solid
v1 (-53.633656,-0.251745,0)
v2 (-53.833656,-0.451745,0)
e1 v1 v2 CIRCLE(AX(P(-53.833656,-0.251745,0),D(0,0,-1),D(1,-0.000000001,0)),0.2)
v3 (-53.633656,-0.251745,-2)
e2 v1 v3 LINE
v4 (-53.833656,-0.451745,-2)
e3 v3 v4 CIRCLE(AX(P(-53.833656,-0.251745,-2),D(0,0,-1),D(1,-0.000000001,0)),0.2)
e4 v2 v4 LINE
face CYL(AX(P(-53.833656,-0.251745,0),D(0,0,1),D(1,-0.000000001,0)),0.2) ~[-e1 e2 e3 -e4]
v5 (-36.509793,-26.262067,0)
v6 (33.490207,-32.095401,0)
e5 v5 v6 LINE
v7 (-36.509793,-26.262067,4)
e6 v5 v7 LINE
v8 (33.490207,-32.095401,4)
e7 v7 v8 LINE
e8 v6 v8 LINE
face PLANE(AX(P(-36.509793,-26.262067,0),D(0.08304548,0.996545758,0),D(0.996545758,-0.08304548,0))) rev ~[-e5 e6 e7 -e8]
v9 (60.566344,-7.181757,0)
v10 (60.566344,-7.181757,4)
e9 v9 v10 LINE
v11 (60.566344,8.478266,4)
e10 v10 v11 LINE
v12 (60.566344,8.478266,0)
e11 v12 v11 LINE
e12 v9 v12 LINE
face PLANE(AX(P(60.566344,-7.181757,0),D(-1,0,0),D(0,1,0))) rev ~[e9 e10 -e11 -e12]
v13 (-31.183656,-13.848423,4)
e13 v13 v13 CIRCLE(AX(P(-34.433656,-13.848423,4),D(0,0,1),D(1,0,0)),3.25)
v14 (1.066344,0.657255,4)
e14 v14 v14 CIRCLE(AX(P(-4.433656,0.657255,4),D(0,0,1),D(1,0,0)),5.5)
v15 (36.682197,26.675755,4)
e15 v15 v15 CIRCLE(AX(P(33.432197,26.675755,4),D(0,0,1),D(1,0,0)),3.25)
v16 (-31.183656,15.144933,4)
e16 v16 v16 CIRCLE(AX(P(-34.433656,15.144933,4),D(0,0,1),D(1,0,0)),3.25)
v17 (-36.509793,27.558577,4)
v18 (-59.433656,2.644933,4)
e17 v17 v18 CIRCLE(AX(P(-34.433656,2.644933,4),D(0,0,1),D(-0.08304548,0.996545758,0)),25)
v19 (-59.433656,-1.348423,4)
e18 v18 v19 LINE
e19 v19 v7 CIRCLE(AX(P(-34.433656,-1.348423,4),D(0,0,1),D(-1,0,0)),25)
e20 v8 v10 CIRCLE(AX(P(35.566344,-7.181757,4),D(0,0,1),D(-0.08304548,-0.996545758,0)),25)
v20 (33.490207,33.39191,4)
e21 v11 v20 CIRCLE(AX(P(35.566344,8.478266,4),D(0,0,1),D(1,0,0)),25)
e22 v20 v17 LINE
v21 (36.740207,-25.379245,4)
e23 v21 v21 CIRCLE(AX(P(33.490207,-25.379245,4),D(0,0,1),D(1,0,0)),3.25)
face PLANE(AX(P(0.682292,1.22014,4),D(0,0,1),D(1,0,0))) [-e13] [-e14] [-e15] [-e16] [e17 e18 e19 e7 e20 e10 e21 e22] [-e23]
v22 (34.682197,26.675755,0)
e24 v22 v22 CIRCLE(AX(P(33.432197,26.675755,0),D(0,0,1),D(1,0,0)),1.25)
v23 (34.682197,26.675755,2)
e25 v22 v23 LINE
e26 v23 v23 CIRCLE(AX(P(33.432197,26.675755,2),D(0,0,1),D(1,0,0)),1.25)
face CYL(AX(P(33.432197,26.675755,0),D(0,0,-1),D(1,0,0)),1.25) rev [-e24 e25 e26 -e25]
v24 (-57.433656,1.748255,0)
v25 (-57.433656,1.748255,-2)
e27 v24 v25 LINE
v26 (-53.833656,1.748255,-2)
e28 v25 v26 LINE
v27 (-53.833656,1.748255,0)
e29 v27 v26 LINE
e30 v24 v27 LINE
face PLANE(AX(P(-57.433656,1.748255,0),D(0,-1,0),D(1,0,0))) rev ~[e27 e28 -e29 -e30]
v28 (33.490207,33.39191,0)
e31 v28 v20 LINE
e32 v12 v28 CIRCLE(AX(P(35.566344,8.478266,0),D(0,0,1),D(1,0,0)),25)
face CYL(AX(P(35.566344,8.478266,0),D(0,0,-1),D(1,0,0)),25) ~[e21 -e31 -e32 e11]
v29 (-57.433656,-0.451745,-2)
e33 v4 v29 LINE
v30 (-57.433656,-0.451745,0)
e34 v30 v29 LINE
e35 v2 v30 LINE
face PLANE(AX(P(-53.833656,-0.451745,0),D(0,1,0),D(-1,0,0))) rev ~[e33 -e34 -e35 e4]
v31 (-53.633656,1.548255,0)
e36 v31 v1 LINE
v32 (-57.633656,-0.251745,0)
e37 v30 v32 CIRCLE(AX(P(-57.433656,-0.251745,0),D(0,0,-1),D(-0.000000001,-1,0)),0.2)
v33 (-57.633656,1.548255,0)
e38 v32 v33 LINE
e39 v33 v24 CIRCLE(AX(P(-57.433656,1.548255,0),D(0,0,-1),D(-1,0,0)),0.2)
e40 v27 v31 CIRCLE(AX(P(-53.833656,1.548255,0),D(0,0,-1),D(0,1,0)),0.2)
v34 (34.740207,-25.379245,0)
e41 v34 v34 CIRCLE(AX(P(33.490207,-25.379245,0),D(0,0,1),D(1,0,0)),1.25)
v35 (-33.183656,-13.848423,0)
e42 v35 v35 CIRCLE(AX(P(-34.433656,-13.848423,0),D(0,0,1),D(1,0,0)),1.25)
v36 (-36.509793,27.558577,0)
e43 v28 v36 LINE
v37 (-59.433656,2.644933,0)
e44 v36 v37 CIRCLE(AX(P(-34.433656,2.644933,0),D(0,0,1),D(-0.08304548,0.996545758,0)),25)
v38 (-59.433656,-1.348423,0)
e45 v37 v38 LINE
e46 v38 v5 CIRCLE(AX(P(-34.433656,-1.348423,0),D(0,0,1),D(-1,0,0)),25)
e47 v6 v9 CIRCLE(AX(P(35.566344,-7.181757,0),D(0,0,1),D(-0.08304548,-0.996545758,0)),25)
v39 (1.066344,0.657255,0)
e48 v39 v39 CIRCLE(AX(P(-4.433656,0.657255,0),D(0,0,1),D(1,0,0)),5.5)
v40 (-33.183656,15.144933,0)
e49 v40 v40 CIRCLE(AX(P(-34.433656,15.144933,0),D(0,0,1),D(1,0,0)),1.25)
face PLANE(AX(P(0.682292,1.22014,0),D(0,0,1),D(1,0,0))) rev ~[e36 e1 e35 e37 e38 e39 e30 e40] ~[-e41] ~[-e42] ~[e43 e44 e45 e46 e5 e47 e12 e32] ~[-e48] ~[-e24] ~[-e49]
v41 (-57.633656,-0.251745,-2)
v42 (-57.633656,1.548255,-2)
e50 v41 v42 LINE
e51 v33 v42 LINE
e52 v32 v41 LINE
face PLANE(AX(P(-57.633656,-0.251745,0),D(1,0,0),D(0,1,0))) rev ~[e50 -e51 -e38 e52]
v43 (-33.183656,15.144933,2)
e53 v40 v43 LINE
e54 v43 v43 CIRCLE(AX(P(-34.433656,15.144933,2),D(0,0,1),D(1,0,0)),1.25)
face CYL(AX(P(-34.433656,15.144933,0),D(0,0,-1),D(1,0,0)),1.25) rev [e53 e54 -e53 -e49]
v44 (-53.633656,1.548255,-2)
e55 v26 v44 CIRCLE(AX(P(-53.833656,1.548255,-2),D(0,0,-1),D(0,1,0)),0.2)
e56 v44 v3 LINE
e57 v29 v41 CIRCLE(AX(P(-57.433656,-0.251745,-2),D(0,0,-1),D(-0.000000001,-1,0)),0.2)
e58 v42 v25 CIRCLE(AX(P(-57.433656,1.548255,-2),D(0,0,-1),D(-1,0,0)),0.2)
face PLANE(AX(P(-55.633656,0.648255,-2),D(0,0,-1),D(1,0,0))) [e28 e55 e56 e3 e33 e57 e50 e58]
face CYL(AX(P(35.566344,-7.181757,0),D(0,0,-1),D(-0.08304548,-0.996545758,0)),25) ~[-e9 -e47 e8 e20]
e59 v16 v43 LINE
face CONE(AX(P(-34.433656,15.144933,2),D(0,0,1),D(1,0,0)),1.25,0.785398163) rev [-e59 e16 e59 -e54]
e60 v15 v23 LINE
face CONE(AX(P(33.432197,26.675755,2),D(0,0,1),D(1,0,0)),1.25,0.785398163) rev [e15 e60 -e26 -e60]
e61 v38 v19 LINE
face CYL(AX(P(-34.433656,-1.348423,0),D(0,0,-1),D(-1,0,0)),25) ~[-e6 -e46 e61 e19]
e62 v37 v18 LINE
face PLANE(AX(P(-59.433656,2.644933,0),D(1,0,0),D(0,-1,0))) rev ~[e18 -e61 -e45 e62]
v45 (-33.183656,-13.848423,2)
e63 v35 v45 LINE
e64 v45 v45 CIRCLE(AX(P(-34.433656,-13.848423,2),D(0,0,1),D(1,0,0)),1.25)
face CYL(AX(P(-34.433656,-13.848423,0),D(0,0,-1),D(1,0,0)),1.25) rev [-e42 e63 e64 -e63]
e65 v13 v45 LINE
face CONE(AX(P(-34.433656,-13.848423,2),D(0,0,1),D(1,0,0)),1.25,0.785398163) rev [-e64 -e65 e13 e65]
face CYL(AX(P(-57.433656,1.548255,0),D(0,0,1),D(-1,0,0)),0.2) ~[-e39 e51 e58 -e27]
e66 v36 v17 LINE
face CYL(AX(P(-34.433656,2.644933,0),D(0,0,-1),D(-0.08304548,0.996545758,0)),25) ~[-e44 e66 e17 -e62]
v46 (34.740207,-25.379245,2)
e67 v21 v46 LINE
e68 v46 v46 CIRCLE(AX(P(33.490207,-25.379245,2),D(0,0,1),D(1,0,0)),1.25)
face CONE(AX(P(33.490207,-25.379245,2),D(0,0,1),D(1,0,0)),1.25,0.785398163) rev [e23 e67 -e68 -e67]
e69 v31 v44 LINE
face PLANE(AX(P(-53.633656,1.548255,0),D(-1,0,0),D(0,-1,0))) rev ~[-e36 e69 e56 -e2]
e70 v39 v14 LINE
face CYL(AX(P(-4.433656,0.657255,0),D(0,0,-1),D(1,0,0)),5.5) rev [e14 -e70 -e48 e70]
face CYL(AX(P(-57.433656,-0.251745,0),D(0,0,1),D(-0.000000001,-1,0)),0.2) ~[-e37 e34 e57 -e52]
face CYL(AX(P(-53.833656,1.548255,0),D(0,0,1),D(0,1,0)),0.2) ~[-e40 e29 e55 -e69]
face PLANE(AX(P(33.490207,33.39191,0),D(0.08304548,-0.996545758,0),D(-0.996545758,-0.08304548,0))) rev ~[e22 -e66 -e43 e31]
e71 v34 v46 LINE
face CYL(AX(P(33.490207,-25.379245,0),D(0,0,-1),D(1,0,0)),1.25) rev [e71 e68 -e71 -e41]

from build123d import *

# Parameters (mm, degrees)
F0_R     = 1.25
F0_R_2   = 5.5
F1_DEPTH = 4
F3_DEPTH = 2
F4_SIZE  = 2


# Not quite as in the source:
# - a feature names something its author has since deleted; it is built from what else it names


with BuildPart() as f1:
    # F0 (on Top) → F1 (new body)
    with BuildSketch(Plane.XY):
        with BuildLine():
            ThreePointArc((-36.0336562554, 5.4360876058), (-41.0336562554, 10.4360876058), (-46.0336562554, 5.4360876058))
            ThreePointArc((-46.0336562554, 5.4360876058), (-48.7113140605, 0.9910484741), (-53.6336562554, -0.6517453414))
            Line((-53.6336562554, -0.6517453414), (-57.6336562554, -0.6517453414))
            Line((-57.6336562554, -0.6517453414), (-59.4336562554, -0.6517453414))
            Line((-59.4336562554, -0.6517453414), (-59.4336562554, -1.3484233022))
            ThreePointArc((-59.4336562554, -1.3484233022), (-52.8307134237, -18.2761605269), (-36.5097932518, -26.2620672584))
            Line((-36.5097932518, -26.2620672584), (33.4902067482, -32.0954005917))
            ThreePointArc((33.4902067482, -32.0954005917), (52.4940809692, -25.5788138039), (60.5663437446, -7.1817566356))
            Line((60.5663437446, -7.1817566356), (60.5663437446, 8.4782659528))
            ThreePointArc((60.5663437446, 8.4782659528), (52.4940809692, 26.8753231211), (33.4902067482, 33.3919099089))
            Line((33.4902067482, 33.3919099089), (-36.5097932518, 27.5585765756))
            ThreePointArc((-36.5097932518, 27.5585765756), (-52.8307134237, 19.5726698441), (-59.4336562554, 2.6449326195))
            Line((-59.4336562554, 2.6449326195), (-59.4336562554, 1.9482546586))
            Line((-59.4336562554, 1.9482546586), (-57.6336562554, 1.9482546586))
            Line((-57.6336562554, 1.9482546586), (-53.6336562554, 1.9482546586))
            ThreePointArc((-53.6336562554, 1.9482546586), (-50.3543429782, 2.8450290737), (-48.4065189788, 5.6314392355))
            ThreePointArc((-48.4065189788, 5.6314392355), (-40.8279863477, 12.5929298404), (-33.4336562554, 5.4360876058))
            ThreePointArc((-33.4336562554, 5.4360876058), (-31.5267024615, 2.8420068396), (-28.4336562554, 1.9482546586))
            Line((-28.4336562554, 1.9482546586), (-15.4336562554, 1.9482546586))
            Line((-15.4336562554, 1.9482546586), (-15.4336562554, 15.2482546586))
            Line((-15.4336562554, 15.2482546586), (-4.9336562554, 15.2482546586))
            Line((-4.9336562554, 15.2482546586), (-4.9336562554, 17.1757546586))
            ThreePointArc((-4.9336562554, 17.1757546586), (-0.8336562554, 21.2757546586), (3.2663437446, 17.1757546586))
            Line((3.2663437446, 17.1757546586), (3.2663437446, 15.2482546586))
            Line((3.2663437446, 15.2482546586), (29.2163437446, 15.2482546586))
            Line((29.2163437446, 15.2482546586), (29.2163437446, 17.1757546586))
            ThreePointArc((29.2163437446, 17.1757546586), (33.3163437446, 21.2757546586), (37.4163437446, 17.1757546586))
            Line((37.4163437446, 17.1757546586), (37.4163437446, 15.2482546586))
            Line((37.4163437446, 15.2482546586), (47.9163437446, 15.2482546586))
            Line((47.9163437446, 15.2482546586), (47.9163437446, -13.9517453414))
            Line((47.9163437446, -13.9517453414), (37.4163437446, -13.9517453414))
            Line((37.4163437446, -13.9517453414), (37.4163437446, -15.8792453414))
            ThreePointArc((37.4163437446, -15.8792453414), (33.3163437446, -19.9792453414), (29.2163437446, -15.8792453414))
            Line((29.2163437446, -15.8792453414), (29.2163437446, -13.9517453414))
            Line((29.2163437446, -13.9517453414), (3.2663437446, -13.9517453414))
            Line((3.2663437446, -13.9517453414), (3.2663437446, -15.8792453414))
            ThreePointArc((3.2663437446, -15.8792453414), (-0.8336562554, -19.9792453414), (-4.9336562554, -15.8792453414))
            Line((-4.9336562554, -15.8792453414), (-4.9336562554, -13.9517453414))
            Line((-4.9336562554, -13.9517453414), (-15.4336562554, -13.9517453414))
            Line((-15.4336562554, -13.9517453414), (-15.4336562554, -0.6517453414))
            Line((-15.4336562554, -0.6517453414), (-28.4336562554, -0.6517453414))
            ThreePointArc((-28.4336562554, -0.6517453414), (-33.3559984503, 0.991048474), (-36.0336562554, 5.4360876058))
        make_face()
        with Locations((-34.4336562554, -13.8484233022)):
            Circle(F0_R, mode=Mode.SUBTRACT)
        with Locations((33.4902067482, -25.3792453414)):
            Circle(F0_R, mode=Mode.SUBTRACT)
        with Locations((-34.4336562554, 15.1449326195)):
            Circle(F0_R, mode=Mode.SUBTRACT)
        with Locations((33.4321971192, 26.6757546586)):
            Circle(F0_R, mode=Mode.SUBTRACT)
        with BuildLine():
            ThreePointArc((-53.6336562554, -0.6517453414), (-48.7113140605, 0.9910484741), (-46.0336562554, 5.4360876058))
            ThreePointArc((-46.0336562554, 5.4360876058), (-41.0336562554, 10.4360876058), (-36.0336562554, 5.4360876058))
            ThreePointArc((-36.0336562554, 5.4360876058), (-33.3559984503, 0.991048474), (-28.4336562554, -0.6517453414))
            Line((-28.4336562554, -0.6517453414), (-15.4336562554, -0.6517453414))
            Line((-15.4336562554, -0.6517453414), (-15.4336562554, -13.9517453414))
            Line((-15.4336562554, -13.9517453414), (-4.9336562554, -13.9517453414))
            Line((-4.9336562554, -13.9517453414), (-4.9336562554, -15.8792453414))
            ThreePointArc((-4.9336562554, -15.8792453414), (-0.8336562554, -19.9792453414), (3.2663437446, -15.8792453414))
            Line((3.2663437446, -15.8792453414), (3.2663437446, -13.9517453414))
            Line((3.2663437446, -13.9517453414), (29.2163437446, -13.9517453414))
            Line((29.2163437446, -13.9517453414), (29.2163437446, -15.8792453414))
            ThreePointArc((29.2163437446, -15.8792453414), (33.3163437446, -19.9792453414), (37.4163437446, -15.8792453414))
            Line((37.4163437446, -15.8792453414), (37.4163437446, -13.9517453414))
            Line((37.4163437446, -13.9517453414), (47.9163437446, -13.9517453414))
            Line((47.9163437446, -13.9517453414), (47.9163437446, 15.2482546586))
            Line((47.9163437446, 15.2482546586), (37.4163437446, 15.2482546586))
            Line((37.4163437446, 15.2482546586), (37.4163437446, 17.1757546586))
            ThreePointArc((37.4163437446, 17.1757546586), (33.3163437446, 21.2757546586), (29.2163437446, 17.1757546586))
            Line((29.2163437446, 17.1757546586), (29.2163437446, 15.2482546586))
            Line((29.2163437446, 15.2482546586), (3.2663437446, 15.2482546586))
            Line((3.2663437446, 15.2482546586), (3.2663437446, 17.1757546586))
            ThreePointArc((3.2663437446, 17.1757546586), (-0.8336562554, 21.2757546586), (-4.9336562554, 17.1757546586))
            Line((-4.9336562554, 17.1757546586), (-4.9336562554, 15.2482546586))
            Line((-4.9336562554, 15.2482546586), (-15.4336562554, 15.2482546586))
            Line((-15.4336562554, 15.2482546586), (-15.4336562554, 1.9482546586))
            Line((-15.4336562554, 1.9482546586), (-28.4336562554, 1.9482546586))
            ThreePointArc((-28.4336562554, 1.9482546586), (-31.5267024615, 2.8420068396), (-33.4336562554, 5.4360876058))
            ThreePointArc((-33.4336562554, 5.4360876058), (-40.8279863477, 12.5929298404), (-48.4065189788, 5.6314392355))
            ThreePointArc((-48.4065189788, 5.6314392355), (-50.3543429782, 2.8450290737), (-53.6336562554, 1.9482546586))
            Line((-53.6336562554, 1.9482546586), (-53.6336562554, -0.6517453414))
        make_face()
        with Locations((-4.4336562554, 0.6572546586)):
            Circle(F0_R_2, mode=Mode.SUBTRACT)
        Polygon((-59.4336562554, -0.6517453414), (-57.6336562554, -0.6517453414), (-57.6336562554, 0.6482546586), (-57.6336562554, 1.9482546586), (-59.4336562554, 1.9482546586), align=None)
        Polygon((-57.6336562554, -0.6517453414), (-53.6336562554, -0.6517453414), (-53.6336562554, 1.9482546586), (-57.6336562554, 1.9482546586), (-57.6336562554, 0.6482546586), align=None)
    extrude(amount=F1_DEPTH)

    # F2 (on face) → F3 (join)
    with BuildSketch(Plane(origin=(0, 0, 0), x_dir=(1, 0, 0), z_dir=(0, 0, -1))):
        with BuildLine():
            ThreePointArc((-53.8336562554, -1.7482546586), (-53.6922348992, -1.6896760149), (-53.6336562554, -1.5482546586))
            Line((-53.6336562554, -1.5482546586), (-53.6336562554, 0.2517453414))
            ThreePointArc((-53.6336562554, 0.2517453414), (-53.6922348992, 0.3931666976), (-53.8336562554, 0.4517453414))
            Line((-53.8336562554, 0.4517453414), (-57.4336562554, 0.4517453414))
            ThreePointArc((-57.4336562554, 0.4517453414), (-57.5750776116, 0.3931666976), (-57.6336562554, 0.2517453414))
            Line((-57.6336562554, 0.2517453414), (-57.6336562554, -0.6482546586))
            Line((-57.6336562554, -0.6482546586), (-57.6336562554, -1.5482546586))
            ThreePointArc((-57.6336562554, -1.5482546586), (-57.5750776116, -1.6896760149), (-57.4336562554, -1.7482546586))
            Line((-57.4336562554, -1.7482546586), (-53.8336562554, -1.7482546586))
        make_face()
    extrude(amount=F3_DEPTH)

    # F4
    f4_edges = [f1.edges().sort_by_distance(p)[0] for p in [
        (-35.683656, 15.144933, 4),
        (-35.683656, -13.848423, 4),
        (32.182197, 26.675755, 4),
        (32.240207, -25.379245, 4),
    ]]
    chamfer(f4_edges, length=F4_SIZE)


solid = f1.part
